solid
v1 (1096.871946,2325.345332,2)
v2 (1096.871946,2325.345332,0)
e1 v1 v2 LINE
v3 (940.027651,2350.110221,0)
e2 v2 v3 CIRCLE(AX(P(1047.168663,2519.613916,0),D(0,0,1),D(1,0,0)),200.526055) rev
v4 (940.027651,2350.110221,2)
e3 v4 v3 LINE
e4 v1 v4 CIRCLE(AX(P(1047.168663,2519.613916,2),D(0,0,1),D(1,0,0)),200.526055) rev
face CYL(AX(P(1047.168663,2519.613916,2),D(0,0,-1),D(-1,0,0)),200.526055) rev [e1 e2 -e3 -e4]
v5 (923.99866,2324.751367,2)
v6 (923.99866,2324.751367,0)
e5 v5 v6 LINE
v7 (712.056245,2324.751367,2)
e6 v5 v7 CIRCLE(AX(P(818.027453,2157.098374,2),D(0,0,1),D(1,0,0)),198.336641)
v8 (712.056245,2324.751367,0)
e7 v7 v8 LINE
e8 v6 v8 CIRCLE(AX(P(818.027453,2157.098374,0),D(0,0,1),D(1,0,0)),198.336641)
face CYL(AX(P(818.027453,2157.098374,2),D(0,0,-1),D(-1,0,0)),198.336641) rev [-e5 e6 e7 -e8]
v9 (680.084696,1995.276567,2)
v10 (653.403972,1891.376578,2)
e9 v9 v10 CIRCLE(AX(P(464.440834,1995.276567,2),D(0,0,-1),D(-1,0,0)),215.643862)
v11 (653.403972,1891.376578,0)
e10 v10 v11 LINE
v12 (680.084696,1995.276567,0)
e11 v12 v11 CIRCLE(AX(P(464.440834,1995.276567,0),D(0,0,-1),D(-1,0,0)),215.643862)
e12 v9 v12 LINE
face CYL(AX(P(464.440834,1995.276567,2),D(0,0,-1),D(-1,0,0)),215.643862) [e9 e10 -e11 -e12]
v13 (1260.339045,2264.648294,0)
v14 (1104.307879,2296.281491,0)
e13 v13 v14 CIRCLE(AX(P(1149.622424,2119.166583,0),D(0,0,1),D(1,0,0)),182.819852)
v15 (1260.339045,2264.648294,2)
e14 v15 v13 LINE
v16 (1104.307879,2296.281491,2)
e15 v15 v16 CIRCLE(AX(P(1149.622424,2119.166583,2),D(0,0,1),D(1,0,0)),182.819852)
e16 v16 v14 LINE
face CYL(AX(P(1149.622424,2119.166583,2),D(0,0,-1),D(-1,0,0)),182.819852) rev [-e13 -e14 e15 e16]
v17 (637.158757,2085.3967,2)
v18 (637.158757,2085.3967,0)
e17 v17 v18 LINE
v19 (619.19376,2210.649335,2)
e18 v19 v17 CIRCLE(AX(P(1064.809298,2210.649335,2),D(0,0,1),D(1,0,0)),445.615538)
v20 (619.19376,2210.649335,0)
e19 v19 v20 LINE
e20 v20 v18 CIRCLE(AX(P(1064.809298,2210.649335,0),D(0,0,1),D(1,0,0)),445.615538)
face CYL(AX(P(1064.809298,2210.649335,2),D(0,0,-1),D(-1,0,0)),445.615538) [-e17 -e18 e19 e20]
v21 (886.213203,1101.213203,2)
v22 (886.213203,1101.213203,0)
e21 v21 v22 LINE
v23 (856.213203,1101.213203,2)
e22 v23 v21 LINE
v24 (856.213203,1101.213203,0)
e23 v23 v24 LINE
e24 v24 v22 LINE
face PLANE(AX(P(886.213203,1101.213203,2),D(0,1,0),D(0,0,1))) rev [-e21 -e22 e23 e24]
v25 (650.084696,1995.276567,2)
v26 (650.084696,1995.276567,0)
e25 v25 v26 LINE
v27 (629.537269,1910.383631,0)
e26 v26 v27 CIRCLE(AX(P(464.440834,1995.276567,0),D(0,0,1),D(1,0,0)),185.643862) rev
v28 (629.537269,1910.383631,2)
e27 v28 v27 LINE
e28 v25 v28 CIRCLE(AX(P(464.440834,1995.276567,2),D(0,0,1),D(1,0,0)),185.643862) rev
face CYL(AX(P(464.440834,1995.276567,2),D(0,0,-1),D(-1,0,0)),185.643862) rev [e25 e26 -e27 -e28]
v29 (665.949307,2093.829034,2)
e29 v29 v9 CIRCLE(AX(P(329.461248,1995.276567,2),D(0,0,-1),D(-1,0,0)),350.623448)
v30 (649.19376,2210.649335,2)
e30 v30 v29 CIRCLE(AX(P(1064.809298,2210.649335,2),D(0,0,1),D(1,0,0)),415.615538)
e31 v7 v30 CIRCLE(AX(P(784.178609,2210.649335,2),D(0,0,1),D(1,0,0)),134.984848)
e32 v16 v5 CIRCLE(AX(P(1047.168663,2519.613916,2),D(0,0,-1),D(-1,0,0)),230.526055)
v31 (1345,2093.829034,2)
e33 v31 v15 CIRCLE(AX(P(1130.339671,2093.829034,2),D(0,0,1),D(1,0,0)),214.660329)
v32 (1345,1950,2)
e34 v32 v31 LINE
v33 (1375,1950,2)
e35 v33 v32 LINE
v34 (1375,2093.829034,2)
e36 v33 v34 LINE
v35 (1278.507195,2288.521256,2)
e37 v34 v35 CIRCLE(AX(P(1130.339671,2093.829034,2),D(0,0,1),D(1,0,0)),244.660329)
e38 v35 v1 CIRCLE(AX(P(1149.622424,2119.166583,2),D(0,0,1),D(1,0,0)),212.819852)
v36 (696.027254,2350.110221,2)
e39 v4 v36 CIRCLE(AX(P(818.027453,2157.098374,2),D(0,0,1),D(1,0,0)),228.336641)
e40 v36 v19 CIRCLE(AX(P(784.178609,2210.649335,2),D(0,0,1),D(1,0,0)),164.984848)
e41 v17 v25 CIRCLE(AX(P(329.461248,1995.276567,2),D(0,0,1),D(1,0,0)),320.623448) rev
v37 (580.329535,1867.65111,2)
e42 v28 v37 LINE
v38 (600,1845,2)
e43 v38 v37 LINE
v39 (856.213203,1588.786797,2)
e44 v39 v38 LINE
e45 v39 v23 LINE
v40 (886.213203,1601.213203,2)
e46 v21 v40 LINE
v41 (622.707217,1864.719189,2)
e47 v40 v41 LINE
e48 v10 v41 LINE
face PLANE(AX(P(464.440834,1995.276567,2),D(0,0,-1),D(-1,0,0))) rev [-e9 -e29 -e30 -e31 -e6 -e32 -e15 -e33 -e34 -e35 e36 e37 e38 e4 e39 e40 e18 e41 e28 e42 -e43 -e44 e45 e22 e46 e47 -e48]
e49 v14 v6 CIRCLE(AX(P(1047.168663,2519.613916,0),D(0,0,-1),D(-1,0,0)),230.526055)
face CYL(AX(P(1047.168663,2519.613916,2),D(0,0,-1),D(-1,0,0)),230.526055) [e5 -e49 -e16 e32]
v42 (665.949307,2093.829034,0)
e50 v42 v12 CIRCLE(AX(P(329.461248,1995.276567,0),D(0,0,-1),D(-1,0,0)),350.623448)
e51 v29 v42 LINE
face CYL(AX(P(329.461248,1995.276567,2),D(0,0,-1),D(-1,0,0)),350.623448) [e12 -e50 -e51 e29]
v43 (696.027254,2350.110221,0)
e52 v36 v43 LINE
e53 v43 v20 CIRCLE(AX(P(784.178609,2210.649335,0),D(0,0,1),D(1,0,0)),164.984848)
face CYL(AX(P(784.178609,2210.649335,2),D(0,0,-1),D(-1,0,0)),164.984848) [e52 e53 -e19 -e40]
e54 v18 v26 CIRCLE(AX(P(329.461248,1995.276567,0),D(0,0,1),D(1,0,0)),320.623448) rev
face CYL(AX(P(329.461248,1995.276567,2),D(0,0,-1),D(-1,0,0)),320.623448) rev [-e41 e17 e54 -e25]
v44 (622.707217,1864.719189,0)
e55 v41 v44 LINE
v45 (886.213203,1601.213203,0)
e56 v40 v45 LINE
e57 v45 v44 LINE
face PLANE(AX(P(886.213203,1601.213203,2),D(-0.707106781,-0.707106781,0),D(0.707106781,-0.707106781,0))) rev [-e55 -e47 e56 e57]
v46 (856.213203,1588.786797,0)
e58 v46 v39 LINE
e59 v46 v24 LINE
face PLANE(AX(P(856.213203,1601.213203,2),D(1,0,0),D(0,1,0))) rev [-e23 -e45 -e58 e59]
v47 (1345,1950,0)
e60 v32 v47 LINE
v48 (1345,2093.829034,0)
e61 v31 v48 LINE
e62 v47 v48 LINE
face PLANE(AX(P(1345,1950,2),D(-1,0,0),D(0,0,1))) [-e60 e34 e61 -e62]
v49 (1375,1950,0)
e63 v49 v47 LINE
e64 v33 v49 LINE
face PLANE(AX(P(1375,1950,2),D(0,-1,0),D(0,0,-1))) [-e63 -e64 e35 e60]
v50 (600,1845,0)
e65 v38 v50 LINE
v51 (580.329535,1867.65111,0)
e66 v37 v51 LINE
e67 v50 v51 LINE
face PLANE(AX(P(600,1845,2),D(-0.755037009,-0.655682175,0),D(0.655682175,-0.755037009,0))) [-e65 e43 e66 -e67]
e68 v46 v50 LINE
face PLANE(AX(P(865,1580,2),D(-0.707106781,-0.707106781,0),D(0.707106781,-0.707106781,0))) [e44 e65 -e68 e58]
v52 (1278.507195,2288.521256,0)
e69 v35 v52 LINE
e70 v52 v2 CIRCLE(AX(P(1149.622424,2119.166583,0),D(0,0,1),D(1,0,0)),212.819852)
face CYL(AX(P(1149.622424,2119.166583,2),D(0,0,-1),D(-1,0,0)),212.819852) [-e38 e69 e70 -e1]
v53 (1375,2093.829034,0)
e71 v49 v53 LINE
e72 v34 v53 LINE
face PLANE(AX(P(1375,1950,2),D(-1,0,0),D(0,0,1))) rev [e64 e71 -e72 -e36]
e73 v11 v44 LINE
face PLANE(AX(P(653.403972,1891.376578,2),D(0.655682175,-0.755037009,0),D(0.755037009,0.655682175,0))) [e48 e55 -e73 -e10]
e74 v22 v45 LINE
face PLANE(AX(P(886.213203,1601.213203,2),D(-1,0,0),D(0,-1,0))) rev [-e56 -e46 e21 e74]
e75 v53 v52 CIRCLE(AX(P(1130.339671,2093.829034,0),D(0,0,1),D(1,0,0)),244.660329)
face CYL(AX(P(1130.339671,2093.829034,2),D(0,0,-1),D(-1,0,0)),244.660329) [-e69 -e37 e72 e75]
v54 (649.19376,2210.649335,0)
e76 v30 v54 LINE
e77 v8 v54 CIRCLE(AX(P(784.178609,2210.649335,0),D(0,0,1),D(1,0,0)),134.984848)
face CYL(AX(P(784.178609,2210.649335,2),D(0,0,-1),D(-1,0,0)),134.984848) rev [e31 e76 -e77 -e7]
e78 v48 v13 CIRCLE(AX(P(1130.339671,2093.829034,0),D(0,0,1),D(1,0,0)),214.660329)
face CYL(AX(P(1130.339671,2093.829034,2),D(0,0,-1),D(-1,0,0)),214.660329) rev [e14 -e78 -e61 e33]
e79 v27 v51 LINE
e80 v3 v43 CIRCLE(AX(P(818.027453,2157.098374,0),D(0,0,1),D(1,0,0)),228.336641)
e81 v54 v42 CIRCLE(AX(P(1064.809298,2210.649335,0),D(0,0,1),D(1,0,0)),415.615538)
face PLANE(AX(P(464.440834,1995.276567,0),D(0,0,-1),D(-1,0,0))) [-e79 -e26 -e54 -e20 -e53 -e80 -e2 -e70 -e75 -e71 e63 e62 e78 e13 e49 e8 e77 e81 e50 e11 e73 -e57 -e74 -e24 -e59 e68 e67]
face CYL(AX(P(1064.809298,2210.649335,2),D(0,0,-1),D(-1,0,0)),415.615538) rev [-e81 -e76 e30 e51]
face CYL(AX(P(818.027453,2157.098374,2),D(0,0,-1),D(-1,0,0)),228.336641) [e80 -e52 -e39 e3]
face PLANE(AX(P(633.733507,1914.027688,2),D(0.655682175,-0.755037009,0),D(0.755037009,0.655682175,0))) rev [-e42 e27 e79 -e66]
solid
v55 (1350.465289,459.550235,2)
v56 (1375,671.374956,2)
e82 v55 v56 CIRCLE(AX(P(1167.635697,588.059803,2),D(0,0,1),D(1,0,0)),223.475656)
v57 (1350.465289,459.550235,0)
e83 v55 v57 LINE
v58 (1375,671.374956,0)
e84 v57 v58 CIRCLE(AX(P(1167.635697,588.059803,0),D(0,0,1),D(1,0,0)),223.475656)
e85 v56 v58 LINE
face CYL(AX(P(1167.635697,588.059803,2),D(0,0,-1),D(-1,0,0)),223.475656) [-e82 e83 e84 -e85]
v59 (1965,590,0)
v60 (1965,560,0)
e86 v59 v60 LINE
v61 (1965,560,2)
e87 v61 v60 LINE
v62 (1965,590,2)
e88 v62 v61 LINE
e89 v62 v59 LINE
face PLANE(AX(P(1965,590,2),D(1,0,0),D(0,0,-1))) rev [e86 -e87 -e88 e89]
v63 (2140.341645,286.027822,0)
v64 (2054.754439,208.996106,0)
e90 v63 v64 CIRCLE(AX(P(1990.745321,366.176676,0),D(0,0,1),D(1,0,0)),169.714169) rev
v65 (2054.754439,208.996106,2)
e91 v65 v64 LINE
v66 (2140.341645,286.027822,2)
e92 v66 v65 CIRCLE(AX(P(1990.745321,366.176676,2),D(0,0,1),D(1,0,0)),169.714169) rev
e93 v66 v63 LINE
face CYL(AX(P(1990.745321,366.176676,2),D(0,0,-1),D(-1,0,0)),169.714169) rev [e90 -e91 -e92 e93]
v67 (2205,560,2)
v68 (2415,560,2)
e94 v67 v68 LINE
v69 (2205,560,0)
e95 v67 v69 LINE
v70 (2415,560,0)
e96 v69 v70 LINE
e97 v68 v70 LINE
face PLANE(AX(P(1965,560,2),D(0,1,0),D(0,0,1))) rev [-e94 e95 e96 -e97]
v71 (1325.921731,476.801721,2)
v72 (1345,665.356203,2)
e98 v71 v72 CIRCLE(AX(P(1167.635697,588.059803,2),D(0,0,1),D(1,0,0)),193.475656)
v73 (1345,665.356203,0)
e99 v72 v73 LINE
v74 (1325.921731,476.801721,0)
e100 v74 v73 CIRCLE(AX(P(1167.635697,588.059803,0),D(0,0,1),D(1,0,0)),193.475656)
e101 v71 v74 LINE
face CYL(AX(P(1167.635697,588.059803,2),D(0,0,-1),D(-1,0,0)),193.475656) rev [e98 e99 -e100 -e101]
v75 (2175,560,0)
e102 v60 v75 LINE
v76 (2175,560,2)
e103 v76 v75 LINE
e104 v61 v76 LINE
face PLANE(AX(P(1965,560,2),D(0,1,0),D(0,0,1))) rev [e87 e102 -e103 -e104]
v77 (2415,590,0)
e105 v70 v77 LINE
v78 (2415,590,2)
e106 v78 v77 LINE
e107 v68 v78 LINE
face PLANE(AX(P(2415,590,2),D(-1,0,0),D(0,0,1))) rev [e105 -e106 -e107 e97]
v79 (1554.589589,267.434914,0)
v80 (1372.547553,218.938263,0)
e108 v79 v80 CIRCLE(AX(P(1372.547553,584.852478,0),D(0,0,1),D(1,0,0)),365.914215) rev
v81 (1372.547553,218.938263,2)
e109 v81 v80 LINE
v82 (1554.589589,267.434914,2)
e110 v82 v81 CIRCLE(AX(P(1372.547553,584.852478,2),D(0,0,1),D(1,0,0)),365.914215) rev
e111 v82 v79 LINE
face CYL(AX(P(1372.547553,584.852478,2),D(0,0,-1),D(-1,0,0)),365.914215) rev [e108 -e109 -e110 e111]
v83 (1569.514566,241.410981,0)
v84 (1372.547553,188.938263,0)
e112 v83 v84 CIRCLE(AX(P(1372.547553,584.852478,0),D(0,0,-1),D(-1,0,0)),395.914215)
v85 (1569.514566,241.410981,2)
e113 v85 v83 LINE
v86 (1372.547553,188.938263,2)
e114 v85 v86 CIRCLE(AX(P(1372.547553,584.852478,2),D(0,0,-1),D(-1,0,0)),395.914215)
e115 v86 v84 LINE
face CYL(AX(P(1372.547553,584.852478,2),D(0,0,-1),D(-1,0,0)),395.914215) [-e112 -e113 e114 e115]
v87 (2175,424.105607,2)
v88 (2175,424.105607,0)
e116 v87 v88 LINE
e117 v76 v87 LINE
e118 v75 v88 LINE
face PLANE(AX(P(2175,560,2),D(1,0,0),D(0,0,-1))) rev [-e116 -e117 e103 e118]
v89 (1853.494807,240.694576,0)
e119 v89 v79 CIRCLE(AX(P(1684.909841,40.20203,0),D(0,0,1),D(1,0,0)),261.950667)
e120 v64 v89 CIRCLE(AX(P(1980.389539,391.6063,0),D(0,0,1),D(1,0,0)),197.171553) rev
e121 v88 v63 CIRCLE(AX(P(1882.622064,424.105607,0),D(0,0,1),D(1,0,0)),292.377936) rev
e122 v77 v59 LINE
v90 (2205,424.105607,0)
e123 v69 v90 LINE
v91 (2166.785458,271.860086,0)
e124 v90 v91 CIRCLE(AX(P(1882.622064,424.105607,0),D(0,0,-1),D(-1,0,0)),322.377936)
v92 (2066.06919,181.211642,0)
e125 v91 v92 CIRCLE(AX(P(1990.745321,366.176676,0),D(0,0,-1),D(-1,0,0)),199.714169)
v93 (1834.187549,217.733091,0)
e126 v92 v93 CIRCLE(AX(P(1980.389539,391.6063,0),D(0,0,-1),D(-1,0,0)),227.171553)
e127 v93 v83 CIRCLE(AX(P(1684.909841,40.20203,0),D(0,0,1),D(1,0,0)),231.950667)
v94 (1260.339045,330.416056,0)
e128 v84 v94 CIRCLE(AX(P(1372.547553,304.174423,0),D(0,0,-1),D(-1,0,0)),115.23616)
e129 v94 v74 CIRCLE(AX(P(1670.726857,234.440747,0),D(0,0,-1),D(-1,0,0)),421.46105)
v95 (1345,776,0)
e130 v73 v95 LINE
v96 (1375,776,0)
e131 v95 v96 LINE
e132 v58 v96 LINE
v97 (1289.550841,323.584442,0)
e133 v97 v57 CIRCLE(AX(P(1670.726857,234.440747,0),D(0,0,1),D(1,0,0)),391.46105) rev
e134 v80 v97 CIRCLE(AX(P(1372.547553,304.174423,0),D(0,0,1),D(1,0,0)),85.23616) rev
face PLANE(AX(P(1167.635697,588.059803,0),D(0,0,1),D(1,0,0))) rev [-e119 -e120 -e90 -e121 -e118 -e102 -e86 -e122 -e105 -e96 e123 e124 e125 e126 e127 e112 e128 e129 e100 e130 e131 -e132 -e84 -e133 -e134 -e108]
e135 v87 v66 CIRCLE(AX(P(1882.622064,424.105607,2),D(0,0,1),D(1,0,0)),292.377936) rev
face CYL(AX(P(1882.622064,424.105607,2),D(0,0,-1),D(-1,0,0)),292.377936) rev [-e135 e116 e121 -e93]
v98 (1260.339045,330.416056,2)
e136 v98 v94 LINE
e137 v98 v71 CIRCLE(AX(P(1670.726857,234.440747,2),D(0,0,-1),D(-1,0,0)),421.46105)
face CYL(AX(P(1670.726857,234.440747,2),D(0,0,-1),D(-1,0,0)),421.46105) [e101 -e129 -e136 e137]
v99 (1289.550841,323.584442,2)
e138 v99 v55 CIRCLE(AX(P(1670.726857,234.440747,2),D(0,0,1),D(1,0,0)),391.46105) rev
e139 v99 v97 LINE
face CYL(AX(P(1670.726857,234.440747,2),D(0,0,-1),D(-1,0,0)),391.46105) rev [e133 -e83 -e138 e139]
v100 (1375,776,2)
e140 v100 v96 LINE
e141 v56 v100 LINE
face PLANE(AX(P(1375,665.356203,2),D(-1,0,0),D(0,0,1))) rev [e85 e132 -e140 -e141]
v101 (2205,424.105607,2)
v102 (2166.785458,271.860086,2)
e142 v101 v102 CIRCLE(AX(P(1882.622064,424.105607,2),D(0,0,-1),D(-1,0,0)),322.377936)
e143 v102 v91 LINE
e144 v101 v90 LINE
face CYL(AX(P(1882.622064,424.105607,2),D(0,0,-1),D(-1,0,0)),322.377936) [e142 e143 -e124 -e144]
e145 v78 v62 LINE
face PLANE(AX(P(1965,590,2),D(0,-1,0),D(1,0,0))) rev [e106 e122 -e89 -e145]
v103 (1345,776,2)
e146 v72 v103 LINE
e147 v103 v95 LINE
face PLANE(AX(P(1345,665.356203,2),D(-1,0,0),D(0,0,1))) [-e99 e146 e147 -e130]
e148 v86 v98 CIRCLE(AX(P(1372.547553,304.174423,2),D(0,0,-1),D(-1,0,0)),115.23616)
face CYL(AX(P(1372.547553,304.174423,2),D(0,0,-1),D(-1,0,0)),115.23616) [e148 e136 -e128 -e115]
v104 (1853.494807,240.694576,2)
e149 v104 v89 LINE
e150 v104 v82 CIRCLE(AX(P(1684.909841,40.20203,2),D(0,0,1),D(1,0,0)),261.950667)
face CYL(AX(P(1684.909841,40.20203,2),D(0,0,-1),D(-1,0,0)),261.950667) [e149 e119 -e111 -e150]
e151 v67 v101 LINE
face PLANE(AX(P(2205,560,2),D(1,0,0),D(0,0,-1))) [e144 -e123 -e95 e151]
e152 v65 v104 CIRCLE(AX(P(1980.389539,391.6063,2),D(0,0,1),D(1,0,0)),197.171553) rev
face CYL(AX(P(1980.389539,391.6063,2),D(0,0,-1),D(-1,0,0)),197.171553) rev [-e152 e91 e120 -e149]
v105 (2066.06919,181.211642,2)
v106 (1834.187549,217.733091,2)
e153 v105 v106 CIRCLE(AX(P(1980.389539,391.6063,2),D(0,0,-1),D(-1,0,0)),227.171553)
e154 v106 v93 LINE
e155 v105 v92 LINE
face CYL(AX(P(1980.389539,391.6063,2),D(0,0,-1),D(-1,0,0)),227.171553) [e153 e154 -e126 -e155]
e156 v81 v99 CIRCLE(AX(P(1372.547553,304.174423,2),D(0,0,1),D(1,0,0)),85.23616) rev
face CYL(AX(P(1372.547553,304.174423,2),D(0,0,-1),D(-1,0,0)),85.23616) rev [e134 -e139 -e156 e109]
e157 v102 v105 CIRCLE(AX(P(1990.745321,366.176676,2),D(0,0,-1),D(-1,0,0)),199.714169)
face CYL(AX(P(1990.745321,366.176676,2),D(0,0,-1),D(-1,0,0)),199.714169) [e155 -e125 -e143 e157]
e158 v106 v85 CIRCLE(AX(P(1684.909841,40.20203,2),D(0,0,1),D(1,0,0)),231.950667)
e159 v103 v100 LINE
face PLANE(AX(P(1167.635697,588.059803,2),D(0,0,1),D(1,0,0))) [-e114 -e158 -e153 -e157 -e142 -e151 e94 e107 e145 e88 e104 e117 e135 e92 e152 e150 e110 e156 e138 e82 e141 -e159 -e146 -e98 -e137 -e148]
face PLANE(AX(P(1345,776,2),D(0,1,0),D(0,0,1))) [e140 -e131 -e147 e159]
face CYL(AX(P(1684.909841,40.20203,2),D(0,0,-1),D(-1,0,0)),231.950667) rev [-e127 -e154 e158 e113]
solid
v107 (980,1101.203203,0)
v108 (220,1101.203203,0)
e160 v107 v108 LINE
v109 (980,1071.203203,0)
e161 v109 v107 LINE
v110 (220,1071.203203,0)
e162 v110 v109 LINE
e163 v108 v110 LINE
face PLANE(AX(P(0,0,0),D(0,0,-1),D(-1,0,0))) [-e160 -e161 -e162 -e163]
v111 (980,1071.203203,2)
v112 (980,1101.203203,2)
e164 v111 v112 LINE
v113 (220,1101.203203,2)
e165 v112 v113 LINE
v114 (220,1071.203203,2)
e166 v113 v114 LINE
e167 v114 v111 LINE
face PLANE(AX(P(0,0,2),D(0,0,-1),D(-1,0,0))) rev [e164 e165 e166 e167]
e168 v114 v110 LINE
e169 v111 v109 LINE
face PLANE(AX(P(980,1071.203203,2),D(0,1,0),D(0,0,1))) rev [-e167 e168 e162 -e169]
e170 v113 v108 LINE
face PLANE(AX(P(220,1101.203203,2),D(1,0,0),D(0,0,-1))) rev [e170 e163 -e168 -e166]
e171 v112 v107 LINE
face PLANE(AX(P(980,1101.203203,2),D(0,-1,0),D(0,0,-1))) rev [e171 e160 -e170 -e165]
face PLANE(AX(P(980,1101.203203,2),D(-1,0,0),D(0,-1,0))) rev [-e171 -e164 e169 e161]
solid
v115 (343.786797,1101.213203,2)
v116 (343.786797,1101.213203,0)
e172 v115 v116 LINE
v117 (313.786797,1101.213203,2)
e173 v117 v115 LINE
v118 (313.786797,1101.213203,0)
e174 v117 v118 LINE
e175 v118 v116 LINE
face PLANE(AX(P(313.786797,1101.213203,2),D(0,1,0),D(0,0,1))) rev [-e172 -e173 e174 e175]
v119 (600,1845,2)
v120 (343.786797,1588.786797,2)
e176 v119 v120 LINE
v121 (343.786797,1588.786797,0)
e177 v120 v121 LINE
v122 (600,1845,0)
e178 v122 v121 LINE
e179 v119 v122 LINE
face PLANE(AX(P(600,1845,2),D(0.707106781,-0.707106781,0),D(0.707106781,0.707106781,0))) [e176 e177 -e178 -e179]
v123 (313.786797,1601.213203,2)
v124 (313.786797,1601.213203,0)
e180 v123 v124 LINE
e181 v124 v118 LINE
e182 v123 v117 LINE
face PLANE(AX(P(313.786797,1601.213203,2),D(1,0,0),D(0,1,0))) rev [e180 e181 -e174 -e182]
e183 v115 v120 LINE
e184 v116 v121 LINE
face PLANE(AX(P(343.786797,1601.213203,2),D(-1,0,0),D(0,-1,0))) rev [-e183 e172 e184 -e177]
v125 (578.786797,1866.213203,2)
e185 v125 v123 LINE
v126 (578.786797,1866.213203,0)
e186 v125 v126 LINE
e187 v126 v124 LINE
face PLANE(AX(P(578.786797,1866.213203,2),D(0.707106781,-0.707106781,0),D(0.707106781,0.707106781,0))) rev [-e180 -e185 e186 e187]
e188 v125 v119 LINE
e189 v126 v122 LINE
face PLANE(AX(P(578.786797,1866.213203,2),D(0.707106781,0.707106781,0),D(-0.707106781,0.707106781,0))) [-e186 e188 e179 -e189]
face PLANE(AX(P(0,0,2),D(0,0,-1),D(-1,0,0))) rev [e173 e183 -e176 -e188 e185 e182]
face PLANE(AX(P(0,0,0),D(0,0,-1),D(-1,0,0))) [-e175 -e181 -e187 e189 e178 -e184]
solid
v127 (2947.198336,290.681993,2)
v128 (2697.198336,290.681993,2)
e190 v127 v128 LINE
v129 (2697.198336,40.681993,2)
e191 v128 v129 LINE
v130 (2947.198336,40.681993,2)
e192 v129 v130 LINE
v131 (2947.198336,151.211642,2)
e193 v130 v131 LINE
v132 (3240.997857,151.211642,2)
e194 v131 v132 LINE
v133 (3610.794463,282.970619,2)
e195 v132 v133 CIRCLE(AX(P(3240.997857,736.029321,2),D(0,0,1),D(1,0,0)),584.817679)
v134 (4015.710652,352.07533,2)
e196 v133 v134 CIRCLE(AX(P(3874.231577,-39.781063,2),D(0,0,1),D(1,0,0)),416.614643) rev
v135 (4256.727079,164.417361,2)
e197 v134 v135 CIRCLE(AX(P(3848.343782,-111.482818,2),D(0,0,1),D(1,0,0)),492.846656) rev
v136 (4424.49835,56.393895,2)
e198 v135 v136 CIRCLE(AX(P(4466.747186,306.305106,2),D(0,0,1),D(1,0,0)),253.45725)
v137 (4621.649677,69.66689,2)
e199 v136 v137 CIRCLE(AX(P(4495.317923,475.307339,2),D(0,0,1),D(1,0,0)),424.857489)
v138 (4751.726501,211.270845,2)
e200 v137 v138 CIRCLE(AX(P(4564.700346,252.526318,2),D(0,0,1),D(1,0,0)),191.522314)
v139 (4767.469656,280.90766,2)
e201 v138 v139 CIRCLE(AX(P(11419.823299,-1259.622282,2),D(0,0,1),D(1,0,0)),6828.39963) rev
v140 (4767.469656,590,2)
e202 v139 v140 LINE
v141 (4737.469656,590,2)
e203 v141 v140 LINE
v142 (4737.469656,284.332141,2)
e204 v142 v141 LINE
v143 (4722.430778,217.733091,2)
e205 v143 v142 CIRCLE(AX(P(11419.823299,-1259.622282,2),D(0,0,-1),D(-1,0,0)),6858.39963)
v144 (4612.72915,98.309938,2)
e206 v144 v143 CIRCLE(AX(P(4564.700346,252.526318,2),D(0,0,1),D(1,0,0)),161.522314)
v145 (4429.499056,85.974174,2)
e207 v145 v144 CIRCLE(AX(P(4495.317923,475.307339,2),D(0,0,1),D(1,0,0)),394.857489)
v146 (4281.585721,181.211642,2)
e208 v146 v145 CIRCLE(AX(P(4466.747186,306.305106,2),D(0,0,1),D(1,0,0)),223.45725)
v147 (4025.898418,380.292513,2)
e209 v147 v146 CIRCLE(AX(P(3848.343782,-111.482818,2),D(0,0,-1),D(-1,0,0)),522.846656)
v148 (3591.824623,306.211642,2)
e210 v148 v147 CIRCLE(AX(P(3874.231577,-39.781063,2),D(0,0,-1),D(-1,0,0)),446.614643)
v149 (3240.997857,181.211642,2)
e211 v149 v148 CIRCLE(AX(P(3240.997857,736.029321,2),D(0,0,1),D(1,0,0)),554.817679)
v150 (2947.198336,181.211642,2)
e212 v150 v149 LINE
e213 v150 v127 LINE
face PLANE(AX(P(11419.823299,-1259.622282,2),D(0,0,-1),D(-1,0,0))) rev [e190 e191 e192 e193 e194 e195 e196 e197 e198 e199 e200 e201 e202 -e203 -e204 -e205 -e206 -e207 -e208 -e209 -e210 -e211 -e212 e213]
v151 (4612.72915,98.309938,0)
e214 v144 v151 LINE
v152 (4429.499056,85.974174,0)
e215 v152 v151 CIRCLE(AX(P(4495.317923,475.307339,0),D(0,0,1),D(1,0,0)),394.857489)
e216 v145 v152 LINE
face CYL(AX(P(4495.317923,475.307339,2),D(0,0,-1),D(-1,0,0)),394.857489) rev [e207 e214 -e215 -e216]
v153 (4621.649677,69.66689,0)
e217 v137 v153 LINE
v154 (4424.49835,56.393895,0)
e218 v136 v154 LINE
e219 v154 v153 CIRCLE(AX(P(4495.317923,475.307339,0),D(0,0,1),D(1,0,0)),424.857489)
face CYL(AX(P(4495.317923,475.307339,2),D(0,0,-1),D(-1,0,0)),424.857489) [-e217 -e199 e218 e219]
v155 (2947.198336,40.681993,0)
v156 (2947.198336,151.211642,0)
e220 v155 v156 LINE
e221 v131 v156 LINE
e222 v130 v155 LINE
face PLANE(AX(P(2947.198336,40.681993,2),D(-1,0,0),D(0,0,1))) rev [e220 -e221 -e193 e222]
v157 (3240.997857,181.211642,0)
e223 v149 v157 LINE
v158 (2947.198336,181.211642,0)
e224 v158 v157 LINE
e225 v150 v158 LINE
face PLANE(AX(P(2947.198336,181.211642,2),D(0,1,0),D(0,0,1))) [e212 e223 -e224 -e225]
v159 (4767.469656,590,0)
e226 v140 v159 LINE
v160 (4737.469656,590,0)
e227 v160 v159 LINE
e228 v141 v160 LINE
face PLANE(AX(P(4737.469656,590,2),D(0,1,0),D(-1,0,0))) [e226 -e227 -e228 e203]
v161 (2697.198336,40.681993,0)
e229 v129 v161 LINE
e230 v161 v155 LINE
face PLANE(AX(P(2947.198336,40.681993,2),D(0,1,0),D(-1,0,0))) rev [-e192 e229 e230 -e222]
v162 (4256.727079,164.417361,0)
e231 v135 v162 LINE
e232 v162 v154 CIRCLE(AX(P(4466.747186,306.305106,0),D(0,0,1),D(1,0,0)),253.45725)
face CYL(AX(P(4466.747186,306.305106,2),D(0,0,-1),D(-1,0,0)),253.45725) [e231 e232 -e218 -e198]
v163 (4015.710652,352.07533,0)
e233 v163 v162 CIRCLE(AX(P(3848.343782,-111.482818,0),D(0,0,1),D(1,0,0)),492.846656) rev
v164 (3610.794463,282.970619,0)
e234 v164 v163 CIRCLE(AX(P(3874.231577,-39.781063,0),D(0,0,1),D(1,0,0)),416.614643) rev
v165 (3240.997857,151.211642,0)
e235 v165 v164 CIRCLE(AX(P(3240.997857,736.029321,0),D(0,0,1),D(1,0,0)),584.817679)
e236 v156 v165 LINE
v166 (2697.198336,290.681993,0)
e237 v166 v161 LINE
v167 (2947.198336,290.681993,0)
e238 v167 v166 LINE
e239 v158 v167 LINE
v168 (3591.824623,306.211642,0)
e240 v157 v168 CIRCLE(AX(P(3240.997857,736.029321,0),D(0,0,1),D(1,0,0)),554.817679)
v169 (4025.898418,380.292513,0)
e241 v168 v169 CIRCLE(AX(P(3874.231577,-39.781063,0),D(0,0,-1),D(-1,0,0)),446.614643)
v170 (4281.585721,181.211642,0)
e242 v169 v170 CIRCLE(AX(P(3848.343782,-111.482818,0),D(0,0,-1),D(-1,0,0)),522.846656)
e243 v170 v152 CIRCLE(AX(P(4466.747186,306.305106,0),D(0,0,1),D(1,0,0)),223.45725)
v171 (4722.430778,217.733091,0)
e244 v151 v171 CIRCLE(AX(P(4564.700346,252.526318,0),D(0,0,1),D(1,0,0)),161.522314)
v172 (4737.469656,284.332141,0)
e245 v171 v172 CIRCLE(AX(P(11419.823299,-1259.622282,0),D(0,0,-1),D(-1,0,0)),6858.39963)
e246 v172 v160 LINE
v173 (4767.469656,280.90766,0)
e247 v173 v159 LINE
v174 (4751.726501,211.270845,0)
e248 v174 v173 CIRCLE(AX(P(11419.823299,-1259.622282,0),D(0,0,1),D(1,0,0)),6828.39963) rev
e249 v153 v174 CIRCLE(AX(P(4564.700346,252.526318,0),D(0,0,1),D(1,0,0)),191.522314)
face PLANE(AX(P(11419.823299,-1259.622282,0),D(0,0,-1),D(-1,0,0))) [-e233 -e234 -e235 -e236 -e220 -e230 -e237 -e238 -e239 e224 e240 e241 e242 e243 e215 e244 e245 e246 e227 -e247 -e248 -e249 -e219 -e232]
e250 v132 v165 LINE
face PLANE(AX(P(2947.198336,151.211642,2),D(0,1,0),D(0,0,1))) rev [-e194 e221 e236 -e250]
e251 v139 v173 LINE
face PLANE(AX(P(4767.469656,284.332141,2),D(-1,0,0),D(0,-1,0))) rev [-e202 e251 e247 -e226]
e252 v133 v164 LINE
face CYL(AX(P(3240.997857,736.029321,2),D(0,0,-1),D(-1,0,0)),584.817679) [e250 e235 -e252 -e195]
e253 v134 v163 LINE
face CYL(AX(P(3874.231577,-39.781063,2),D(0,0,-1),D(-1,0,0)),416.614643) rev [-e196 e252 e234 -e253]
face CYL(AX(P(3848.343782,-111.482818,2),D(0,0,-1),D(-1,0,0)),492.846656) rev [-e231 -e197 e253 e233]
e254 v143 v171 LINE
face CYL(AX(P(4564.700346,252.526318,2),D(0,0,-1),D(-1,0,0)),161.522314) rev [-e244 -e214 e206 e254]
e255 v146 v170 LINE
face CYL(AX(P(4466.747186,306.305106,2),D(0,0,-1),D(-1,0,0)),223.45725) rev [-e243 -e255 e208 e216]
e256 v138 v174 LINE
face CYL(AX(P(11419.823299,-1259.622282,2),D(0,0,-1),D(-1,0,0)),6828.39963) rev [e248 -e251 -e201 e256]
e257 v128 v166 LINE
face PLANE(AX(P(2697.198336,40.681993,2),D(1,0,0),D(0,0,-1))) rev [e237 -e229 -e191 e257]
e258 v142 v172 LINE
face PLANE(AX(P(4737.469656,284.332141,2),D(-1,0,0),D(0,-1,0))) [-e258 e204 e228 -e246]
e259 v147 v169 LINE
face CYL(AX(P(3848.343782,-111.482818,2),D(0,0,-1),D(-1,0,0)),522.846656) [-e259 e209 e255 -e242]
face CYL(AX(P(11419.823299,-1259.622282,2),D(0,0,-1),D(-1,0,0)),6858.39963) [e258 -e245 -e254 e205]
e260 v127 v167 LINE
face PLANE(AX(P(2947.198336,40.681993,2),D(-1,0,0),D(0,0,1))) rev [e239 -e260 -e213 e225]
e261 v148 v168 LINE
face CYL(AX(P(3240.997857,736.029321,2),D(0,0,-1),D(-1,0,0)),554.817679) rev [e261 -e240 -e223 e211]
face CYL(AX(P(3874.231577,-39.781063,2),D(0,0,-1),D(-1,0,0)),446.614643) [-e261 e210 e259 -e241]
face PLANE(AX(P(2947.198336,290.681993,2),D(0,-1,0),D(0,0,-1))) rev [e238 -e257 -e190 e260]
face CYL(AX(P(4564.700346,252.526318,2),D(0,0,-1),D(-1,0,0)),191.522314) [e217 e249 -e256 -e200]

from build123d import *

# Parameters (mm, degrees)
EXTRUDE_THIN4_DEPTH = 2
SKETCH3_W           = 250
SKETCH3_H           = 250
BOSS_EXTRUDE3_DEPTH = 2
SKETCH4_W           = 450
SKETCH4_H           = 30
BOSS_EXTRUDE4_DEPTH = 2
SKETCH5_W           = 30
SKETCH5_H           = 500
BOSS_EXTRUDE5_DEPTH = 2
SKETCH6_W           = 760
SKETCH6_H           = 30
BOSS_EXTRUDE7_DEPTH = 2


# Read off the part's stored shape, not the designer's step: Extrude-Thin4
with BuildPart() as part:
    # Extrude-Thin4 outline → Extrude-Thin4 (new body)
    with BuildSketch(Plane.XY):
        with BuildLine():
            Line((580.329534742, 1867.651110272), (600, 1845))
            Line((600, 1845), (865, 1580))
            Line((865, 1580), (886.213203436, 1601.213203436))
            Line((886.213203436, 1601.213203436), (622.7072175, 1864.719189371))
            Line((622.7072175, 1864.719189371), (653.403971795, 1891.376577537))
            ThreePointArc((653.403971795, 1891.376577537), (673.30803603, 1941.641063842), (680.084696225, 1995.276567319))
            ThreePointArc((680.084696225, 1995.276567319), (676.532858701, 2045.057080452), (665.949306803, 2093.829034142))
            ThreePointArc((665.949306803, 2093.829034142), (653.403971795, 2151.641430576), (649.193760322, 2210.649334548))
            ThreePointArc((649.193760322, 2210.649334548), (665.949306803, 2275.785664392), (712.05624475, 2324.751367457))
            ThreePointArc((712.05624475, 2324.751367457), (818.027452504, 2355.435014772), (923.998660258, 2324.751367457))
            ThreePointArc((923.998660258, 2324.751367457), (1011.215225634, 2291.908815799), (1104.307879422, 2296.281490747))
            ThreePointArc((1104.307879422, 2296.281490747), (1185.947658515, 2298.341290514), (1260.339044564, 2264.648294402))
            ThreePointArc((1260.339044564, 2264.648294402), (1322.673710037, 2189.153082854), (1345, 2093.829034142))
            Line((1345, 2093.829034142), (1345, 1950))
            Line((1345, 1950), (1375, 1950))
            Line((1375, 1950), (1375, 2093.829034142))
            ThreePointArc((1375, 2093.829034142), (1349.553484223, 2202.475160007), (1278.507195252, 2288.521256108))
            ThreePointArc((1278.507195252, 2288.521256108), (1191.90848294, 2327.743136922), (1096.871945536, 2325.345332324))
            ThreePointArc((1096.871945536, 2325.345332324), (1015.894102839, 2321.541704759), (940.027651252, 2350.110220896))
            ThreePointArc((940.027651252, 2350.110220896), (818.027452504, 2385.435014772), (696.027253756, 2350.110220896))
            ThreePointArc((696.027253756, 2350.110220896), (639.673179521, 2290.262029098), (619.193760322, 2210.649334548))
            ThreePointArc((619.193760322, 2210.649334548), (623.707873677, 2147.382116479), (637.158757241, 2085.396700186))
            ThreePointArc((637.158757241, 2085.396700186), (646.836760583, 2040.797766355), (650.084696225, 1995.276567319))
            ThreePointArc((650.084696225, 1995.276567319), (644.874732457, 1951.604472445), (629.537269054, 1910.383630513))
            Line((629.537269054, 1910.383630513), (580.329534742, 1867.651110272))
        make_face()
        Polygon((578.786796564, 1866.213203436), (313.786796564, 1601.213203436), (335, 1580), (600, 1845), align=None)
        with BuildLine():
            Line((1375, 671.37495586), (1375, 776))
            Line((1375, 776), (1345, 776))
            Line((1345, 776), (1345, 665.356203402))
            ThreePointArc((1345, 665.356203402), (1360.128516063, 568.583046436), (1325.921730839, 476.80172071))
            ThreePointArc((1325.921730839, 476.80172071), (1286.101995144, 406.757699666), (1260.339044564, 330.416055643))
            ThreePointArc((1260.339044564, 330.416055643), (1282.260904948, 232.566505826), (1372.547552838, 188.938262968))
            ThreePointArc((1372.547552838, 188.938262968), (1474.465890598, 202.281284498), (1569.514565573, 241.410981413))
            ThreePointArc((1569.514565573, 241.410981413), (1705.577822181, 271.230050509), (1834.187549466, 217.73309052))
            ThreePointArc((1834.187549466, 217.73309052), (1945.045622854, 167.201036401), (2066.069190222, 181.211642034))
            ThreePointArc((2066.069190222, 181.211642034), (2124.350152694, 217.73309052), (2166.78545843, 271.860085755))
            ThreePointArc((2166.78545843, 271.860085755), (2195.300446849, 345.621452904), (2205, 424.105607464))
            Line((2205, 424.105607464), (2205, 560))
            Line((2205, 560), (2175, 560))
            Line((2175, 560), (2175, 424.105607464))
            ThreePointArc((2175, 424.105607464), (2166.203072501, 352.92506886), (2140.341645499, 286.02782226))
            ThreePointArc((2140.341645499, 286.02782226), (2104.28074565, 240.031496313), (2054.754439327, 208.996105537))
            ThreePointArc((2054.754439327, 208.996105537), (1949.713097583, 196.835723503), (1853.494807006, 240.694575801))
            ThreePointArc((1853.494807006, 240.694575801), (1708.250974391, 301.110717457), (1554.589589012, 267.434914142))
            ThreePointArc((1554.589589012, 267.434914142), (1466.743131436, 231.270230511), (1372.547552838, 218.938262968))
            ThreePointArc((1372.547552838, 218.938262968), (1305.765674919, 251.2085494), (1289.550840964, 323.58444155))
            ThreePointArc((1289.550840964, 323.58444155), (1313.479960119, 394.492014451), (1350.465289002, 459.550235189))
            ThreePointArc((1350.465289002, 459.550235189), (1389.627244127, 562.34751421), (1375, 671.37495586))
        make_face()
        with BuildLine():
            Line((4767.469655509, 280.907659612), (4767.469655509, 590))
            Line((4767.469655509, 590), (4737.469655509, 590))
            Line((4737.469655509, 590), (4737.469655509, 284.332140954))
            ThreePointArc((4737.469655509, 284.332140954), (4729.867341385, 251.051330007), (4722.430778015, 217.73309052))
            ThreePointArc((4722.430778015, 217.73309052), (4683.652807685, 143.257064619), (4612.729150001, 98.30993793))
            ThreePointArc((4612.729150001, 98.30993793), (4521.841227213, 81.341666779), (4429.499055865, 85.974174218))
            ThreePointArc((4429.499055865, 85.974174218), (4345.775905249, 118.424580356), (4281.585721472, 181.211642034))
            ThreePointArc((4281.585721472, 181.211642034), (4169.554635372, 301.060770828), (4025.898417544, 380.292513234))
            ThreePointArc((4025.898417544, 380.292513234), (3799.09677669, 400.468186566), (3591.824622503, 306.211642034))
            ThreePointArc((3591.824622503, 306.211642034), (3427.213067923, 213.395077999), (3240.997856648, 181.211642034))
            Line((3240.997856648, 181.211642034), (2947.198336269, 181.211642034))
            Line((2947.198336269, 181.211642034), (2947.198336269, 151.211642034))
            Line((2947.198336269, 151.211642034), (3240.997856648, 151.211642034))
            ThreePointArc((3240.997856648, 151.211642034), (3437.282062755, 185.13529486), (3610.794463195, 282.970619163))
            ThreePointArc((3610.794463195, 282.970619163), (3804.143731696, 370.895762838), (4015.710652135, 352.075329888))
            ThreePointArc((4015.710652135, 352.075329888), (4151.124134763, 277.389762246), (4256.727078796, 164.417360736))
            ThreePointArc((4256.727078796, 164.417360736), (4329.535042979, 93.20089322), (4424.498350336, 56.393894568))
            ThreePointArc((4424.498350336, 56.393894568), (4523.856382389, 51.409424136), (4621.649676761, 69.666889868))
            ThreePointArc((4621.649676761, 69.666889868), (4705.746187648, 122.962174577), (4751.726500995, 211.27084516))
            ThreePointArc((4751.726500995, 211.27084516), (4759.507066826, 246.109827809), (4767.469655509, 280.907659612))
        make_face()
    extrude(amount=EXTRUDE_THIN4_DEPTH)

    # Sketch3 → Boss-Extrude3 (add)
    with BuildSketch(Plane.XY):
        with Locations((2822.198336269, 165.681992538)):
            Rectangle(SKETCH3_W, SKETCH3_H)
    extrude(amount=BOSS_EXTRUDE3_DEPTH)

    # Sketch4 → Boss-Extrude4 (add)
    with BuildSketch(Plane.XY):
        with Locations((2190, 575)):
            Rectangle(SKETCH4_W, SKETCH4_H)
    extrude(amount=BOSS_EXTRUDE4_DEPTH)

    # Sketch5 → Boss-Extrude5 (add)
    with BuildSketch(Plane.XY):
        with Locations((328.786796564, 1351.213203436)):
            Rectangle(SKETCH5_W, SKETCH5_H)
        with Locations((871.213203436, 1351.213203436)):
            Rectangle(SKETCH5_W, SKETCH5_H)
    extrude(amount=BOSS_EXTRUDE5_DEPTH)


with BuildPart() as body_2:
    # Sketch6 → Boss-Extrude7 (new body)
    with BuildSketch(Plane.XY):
        with Locations((600, 1086.203203436)):
            Rectangle(SKETCH6_W, SKETCH6_H)
    extrude(amount=BOSS_EXTRUDE7_DEPTH)


solid = Compound([part.part, body_2.part])
